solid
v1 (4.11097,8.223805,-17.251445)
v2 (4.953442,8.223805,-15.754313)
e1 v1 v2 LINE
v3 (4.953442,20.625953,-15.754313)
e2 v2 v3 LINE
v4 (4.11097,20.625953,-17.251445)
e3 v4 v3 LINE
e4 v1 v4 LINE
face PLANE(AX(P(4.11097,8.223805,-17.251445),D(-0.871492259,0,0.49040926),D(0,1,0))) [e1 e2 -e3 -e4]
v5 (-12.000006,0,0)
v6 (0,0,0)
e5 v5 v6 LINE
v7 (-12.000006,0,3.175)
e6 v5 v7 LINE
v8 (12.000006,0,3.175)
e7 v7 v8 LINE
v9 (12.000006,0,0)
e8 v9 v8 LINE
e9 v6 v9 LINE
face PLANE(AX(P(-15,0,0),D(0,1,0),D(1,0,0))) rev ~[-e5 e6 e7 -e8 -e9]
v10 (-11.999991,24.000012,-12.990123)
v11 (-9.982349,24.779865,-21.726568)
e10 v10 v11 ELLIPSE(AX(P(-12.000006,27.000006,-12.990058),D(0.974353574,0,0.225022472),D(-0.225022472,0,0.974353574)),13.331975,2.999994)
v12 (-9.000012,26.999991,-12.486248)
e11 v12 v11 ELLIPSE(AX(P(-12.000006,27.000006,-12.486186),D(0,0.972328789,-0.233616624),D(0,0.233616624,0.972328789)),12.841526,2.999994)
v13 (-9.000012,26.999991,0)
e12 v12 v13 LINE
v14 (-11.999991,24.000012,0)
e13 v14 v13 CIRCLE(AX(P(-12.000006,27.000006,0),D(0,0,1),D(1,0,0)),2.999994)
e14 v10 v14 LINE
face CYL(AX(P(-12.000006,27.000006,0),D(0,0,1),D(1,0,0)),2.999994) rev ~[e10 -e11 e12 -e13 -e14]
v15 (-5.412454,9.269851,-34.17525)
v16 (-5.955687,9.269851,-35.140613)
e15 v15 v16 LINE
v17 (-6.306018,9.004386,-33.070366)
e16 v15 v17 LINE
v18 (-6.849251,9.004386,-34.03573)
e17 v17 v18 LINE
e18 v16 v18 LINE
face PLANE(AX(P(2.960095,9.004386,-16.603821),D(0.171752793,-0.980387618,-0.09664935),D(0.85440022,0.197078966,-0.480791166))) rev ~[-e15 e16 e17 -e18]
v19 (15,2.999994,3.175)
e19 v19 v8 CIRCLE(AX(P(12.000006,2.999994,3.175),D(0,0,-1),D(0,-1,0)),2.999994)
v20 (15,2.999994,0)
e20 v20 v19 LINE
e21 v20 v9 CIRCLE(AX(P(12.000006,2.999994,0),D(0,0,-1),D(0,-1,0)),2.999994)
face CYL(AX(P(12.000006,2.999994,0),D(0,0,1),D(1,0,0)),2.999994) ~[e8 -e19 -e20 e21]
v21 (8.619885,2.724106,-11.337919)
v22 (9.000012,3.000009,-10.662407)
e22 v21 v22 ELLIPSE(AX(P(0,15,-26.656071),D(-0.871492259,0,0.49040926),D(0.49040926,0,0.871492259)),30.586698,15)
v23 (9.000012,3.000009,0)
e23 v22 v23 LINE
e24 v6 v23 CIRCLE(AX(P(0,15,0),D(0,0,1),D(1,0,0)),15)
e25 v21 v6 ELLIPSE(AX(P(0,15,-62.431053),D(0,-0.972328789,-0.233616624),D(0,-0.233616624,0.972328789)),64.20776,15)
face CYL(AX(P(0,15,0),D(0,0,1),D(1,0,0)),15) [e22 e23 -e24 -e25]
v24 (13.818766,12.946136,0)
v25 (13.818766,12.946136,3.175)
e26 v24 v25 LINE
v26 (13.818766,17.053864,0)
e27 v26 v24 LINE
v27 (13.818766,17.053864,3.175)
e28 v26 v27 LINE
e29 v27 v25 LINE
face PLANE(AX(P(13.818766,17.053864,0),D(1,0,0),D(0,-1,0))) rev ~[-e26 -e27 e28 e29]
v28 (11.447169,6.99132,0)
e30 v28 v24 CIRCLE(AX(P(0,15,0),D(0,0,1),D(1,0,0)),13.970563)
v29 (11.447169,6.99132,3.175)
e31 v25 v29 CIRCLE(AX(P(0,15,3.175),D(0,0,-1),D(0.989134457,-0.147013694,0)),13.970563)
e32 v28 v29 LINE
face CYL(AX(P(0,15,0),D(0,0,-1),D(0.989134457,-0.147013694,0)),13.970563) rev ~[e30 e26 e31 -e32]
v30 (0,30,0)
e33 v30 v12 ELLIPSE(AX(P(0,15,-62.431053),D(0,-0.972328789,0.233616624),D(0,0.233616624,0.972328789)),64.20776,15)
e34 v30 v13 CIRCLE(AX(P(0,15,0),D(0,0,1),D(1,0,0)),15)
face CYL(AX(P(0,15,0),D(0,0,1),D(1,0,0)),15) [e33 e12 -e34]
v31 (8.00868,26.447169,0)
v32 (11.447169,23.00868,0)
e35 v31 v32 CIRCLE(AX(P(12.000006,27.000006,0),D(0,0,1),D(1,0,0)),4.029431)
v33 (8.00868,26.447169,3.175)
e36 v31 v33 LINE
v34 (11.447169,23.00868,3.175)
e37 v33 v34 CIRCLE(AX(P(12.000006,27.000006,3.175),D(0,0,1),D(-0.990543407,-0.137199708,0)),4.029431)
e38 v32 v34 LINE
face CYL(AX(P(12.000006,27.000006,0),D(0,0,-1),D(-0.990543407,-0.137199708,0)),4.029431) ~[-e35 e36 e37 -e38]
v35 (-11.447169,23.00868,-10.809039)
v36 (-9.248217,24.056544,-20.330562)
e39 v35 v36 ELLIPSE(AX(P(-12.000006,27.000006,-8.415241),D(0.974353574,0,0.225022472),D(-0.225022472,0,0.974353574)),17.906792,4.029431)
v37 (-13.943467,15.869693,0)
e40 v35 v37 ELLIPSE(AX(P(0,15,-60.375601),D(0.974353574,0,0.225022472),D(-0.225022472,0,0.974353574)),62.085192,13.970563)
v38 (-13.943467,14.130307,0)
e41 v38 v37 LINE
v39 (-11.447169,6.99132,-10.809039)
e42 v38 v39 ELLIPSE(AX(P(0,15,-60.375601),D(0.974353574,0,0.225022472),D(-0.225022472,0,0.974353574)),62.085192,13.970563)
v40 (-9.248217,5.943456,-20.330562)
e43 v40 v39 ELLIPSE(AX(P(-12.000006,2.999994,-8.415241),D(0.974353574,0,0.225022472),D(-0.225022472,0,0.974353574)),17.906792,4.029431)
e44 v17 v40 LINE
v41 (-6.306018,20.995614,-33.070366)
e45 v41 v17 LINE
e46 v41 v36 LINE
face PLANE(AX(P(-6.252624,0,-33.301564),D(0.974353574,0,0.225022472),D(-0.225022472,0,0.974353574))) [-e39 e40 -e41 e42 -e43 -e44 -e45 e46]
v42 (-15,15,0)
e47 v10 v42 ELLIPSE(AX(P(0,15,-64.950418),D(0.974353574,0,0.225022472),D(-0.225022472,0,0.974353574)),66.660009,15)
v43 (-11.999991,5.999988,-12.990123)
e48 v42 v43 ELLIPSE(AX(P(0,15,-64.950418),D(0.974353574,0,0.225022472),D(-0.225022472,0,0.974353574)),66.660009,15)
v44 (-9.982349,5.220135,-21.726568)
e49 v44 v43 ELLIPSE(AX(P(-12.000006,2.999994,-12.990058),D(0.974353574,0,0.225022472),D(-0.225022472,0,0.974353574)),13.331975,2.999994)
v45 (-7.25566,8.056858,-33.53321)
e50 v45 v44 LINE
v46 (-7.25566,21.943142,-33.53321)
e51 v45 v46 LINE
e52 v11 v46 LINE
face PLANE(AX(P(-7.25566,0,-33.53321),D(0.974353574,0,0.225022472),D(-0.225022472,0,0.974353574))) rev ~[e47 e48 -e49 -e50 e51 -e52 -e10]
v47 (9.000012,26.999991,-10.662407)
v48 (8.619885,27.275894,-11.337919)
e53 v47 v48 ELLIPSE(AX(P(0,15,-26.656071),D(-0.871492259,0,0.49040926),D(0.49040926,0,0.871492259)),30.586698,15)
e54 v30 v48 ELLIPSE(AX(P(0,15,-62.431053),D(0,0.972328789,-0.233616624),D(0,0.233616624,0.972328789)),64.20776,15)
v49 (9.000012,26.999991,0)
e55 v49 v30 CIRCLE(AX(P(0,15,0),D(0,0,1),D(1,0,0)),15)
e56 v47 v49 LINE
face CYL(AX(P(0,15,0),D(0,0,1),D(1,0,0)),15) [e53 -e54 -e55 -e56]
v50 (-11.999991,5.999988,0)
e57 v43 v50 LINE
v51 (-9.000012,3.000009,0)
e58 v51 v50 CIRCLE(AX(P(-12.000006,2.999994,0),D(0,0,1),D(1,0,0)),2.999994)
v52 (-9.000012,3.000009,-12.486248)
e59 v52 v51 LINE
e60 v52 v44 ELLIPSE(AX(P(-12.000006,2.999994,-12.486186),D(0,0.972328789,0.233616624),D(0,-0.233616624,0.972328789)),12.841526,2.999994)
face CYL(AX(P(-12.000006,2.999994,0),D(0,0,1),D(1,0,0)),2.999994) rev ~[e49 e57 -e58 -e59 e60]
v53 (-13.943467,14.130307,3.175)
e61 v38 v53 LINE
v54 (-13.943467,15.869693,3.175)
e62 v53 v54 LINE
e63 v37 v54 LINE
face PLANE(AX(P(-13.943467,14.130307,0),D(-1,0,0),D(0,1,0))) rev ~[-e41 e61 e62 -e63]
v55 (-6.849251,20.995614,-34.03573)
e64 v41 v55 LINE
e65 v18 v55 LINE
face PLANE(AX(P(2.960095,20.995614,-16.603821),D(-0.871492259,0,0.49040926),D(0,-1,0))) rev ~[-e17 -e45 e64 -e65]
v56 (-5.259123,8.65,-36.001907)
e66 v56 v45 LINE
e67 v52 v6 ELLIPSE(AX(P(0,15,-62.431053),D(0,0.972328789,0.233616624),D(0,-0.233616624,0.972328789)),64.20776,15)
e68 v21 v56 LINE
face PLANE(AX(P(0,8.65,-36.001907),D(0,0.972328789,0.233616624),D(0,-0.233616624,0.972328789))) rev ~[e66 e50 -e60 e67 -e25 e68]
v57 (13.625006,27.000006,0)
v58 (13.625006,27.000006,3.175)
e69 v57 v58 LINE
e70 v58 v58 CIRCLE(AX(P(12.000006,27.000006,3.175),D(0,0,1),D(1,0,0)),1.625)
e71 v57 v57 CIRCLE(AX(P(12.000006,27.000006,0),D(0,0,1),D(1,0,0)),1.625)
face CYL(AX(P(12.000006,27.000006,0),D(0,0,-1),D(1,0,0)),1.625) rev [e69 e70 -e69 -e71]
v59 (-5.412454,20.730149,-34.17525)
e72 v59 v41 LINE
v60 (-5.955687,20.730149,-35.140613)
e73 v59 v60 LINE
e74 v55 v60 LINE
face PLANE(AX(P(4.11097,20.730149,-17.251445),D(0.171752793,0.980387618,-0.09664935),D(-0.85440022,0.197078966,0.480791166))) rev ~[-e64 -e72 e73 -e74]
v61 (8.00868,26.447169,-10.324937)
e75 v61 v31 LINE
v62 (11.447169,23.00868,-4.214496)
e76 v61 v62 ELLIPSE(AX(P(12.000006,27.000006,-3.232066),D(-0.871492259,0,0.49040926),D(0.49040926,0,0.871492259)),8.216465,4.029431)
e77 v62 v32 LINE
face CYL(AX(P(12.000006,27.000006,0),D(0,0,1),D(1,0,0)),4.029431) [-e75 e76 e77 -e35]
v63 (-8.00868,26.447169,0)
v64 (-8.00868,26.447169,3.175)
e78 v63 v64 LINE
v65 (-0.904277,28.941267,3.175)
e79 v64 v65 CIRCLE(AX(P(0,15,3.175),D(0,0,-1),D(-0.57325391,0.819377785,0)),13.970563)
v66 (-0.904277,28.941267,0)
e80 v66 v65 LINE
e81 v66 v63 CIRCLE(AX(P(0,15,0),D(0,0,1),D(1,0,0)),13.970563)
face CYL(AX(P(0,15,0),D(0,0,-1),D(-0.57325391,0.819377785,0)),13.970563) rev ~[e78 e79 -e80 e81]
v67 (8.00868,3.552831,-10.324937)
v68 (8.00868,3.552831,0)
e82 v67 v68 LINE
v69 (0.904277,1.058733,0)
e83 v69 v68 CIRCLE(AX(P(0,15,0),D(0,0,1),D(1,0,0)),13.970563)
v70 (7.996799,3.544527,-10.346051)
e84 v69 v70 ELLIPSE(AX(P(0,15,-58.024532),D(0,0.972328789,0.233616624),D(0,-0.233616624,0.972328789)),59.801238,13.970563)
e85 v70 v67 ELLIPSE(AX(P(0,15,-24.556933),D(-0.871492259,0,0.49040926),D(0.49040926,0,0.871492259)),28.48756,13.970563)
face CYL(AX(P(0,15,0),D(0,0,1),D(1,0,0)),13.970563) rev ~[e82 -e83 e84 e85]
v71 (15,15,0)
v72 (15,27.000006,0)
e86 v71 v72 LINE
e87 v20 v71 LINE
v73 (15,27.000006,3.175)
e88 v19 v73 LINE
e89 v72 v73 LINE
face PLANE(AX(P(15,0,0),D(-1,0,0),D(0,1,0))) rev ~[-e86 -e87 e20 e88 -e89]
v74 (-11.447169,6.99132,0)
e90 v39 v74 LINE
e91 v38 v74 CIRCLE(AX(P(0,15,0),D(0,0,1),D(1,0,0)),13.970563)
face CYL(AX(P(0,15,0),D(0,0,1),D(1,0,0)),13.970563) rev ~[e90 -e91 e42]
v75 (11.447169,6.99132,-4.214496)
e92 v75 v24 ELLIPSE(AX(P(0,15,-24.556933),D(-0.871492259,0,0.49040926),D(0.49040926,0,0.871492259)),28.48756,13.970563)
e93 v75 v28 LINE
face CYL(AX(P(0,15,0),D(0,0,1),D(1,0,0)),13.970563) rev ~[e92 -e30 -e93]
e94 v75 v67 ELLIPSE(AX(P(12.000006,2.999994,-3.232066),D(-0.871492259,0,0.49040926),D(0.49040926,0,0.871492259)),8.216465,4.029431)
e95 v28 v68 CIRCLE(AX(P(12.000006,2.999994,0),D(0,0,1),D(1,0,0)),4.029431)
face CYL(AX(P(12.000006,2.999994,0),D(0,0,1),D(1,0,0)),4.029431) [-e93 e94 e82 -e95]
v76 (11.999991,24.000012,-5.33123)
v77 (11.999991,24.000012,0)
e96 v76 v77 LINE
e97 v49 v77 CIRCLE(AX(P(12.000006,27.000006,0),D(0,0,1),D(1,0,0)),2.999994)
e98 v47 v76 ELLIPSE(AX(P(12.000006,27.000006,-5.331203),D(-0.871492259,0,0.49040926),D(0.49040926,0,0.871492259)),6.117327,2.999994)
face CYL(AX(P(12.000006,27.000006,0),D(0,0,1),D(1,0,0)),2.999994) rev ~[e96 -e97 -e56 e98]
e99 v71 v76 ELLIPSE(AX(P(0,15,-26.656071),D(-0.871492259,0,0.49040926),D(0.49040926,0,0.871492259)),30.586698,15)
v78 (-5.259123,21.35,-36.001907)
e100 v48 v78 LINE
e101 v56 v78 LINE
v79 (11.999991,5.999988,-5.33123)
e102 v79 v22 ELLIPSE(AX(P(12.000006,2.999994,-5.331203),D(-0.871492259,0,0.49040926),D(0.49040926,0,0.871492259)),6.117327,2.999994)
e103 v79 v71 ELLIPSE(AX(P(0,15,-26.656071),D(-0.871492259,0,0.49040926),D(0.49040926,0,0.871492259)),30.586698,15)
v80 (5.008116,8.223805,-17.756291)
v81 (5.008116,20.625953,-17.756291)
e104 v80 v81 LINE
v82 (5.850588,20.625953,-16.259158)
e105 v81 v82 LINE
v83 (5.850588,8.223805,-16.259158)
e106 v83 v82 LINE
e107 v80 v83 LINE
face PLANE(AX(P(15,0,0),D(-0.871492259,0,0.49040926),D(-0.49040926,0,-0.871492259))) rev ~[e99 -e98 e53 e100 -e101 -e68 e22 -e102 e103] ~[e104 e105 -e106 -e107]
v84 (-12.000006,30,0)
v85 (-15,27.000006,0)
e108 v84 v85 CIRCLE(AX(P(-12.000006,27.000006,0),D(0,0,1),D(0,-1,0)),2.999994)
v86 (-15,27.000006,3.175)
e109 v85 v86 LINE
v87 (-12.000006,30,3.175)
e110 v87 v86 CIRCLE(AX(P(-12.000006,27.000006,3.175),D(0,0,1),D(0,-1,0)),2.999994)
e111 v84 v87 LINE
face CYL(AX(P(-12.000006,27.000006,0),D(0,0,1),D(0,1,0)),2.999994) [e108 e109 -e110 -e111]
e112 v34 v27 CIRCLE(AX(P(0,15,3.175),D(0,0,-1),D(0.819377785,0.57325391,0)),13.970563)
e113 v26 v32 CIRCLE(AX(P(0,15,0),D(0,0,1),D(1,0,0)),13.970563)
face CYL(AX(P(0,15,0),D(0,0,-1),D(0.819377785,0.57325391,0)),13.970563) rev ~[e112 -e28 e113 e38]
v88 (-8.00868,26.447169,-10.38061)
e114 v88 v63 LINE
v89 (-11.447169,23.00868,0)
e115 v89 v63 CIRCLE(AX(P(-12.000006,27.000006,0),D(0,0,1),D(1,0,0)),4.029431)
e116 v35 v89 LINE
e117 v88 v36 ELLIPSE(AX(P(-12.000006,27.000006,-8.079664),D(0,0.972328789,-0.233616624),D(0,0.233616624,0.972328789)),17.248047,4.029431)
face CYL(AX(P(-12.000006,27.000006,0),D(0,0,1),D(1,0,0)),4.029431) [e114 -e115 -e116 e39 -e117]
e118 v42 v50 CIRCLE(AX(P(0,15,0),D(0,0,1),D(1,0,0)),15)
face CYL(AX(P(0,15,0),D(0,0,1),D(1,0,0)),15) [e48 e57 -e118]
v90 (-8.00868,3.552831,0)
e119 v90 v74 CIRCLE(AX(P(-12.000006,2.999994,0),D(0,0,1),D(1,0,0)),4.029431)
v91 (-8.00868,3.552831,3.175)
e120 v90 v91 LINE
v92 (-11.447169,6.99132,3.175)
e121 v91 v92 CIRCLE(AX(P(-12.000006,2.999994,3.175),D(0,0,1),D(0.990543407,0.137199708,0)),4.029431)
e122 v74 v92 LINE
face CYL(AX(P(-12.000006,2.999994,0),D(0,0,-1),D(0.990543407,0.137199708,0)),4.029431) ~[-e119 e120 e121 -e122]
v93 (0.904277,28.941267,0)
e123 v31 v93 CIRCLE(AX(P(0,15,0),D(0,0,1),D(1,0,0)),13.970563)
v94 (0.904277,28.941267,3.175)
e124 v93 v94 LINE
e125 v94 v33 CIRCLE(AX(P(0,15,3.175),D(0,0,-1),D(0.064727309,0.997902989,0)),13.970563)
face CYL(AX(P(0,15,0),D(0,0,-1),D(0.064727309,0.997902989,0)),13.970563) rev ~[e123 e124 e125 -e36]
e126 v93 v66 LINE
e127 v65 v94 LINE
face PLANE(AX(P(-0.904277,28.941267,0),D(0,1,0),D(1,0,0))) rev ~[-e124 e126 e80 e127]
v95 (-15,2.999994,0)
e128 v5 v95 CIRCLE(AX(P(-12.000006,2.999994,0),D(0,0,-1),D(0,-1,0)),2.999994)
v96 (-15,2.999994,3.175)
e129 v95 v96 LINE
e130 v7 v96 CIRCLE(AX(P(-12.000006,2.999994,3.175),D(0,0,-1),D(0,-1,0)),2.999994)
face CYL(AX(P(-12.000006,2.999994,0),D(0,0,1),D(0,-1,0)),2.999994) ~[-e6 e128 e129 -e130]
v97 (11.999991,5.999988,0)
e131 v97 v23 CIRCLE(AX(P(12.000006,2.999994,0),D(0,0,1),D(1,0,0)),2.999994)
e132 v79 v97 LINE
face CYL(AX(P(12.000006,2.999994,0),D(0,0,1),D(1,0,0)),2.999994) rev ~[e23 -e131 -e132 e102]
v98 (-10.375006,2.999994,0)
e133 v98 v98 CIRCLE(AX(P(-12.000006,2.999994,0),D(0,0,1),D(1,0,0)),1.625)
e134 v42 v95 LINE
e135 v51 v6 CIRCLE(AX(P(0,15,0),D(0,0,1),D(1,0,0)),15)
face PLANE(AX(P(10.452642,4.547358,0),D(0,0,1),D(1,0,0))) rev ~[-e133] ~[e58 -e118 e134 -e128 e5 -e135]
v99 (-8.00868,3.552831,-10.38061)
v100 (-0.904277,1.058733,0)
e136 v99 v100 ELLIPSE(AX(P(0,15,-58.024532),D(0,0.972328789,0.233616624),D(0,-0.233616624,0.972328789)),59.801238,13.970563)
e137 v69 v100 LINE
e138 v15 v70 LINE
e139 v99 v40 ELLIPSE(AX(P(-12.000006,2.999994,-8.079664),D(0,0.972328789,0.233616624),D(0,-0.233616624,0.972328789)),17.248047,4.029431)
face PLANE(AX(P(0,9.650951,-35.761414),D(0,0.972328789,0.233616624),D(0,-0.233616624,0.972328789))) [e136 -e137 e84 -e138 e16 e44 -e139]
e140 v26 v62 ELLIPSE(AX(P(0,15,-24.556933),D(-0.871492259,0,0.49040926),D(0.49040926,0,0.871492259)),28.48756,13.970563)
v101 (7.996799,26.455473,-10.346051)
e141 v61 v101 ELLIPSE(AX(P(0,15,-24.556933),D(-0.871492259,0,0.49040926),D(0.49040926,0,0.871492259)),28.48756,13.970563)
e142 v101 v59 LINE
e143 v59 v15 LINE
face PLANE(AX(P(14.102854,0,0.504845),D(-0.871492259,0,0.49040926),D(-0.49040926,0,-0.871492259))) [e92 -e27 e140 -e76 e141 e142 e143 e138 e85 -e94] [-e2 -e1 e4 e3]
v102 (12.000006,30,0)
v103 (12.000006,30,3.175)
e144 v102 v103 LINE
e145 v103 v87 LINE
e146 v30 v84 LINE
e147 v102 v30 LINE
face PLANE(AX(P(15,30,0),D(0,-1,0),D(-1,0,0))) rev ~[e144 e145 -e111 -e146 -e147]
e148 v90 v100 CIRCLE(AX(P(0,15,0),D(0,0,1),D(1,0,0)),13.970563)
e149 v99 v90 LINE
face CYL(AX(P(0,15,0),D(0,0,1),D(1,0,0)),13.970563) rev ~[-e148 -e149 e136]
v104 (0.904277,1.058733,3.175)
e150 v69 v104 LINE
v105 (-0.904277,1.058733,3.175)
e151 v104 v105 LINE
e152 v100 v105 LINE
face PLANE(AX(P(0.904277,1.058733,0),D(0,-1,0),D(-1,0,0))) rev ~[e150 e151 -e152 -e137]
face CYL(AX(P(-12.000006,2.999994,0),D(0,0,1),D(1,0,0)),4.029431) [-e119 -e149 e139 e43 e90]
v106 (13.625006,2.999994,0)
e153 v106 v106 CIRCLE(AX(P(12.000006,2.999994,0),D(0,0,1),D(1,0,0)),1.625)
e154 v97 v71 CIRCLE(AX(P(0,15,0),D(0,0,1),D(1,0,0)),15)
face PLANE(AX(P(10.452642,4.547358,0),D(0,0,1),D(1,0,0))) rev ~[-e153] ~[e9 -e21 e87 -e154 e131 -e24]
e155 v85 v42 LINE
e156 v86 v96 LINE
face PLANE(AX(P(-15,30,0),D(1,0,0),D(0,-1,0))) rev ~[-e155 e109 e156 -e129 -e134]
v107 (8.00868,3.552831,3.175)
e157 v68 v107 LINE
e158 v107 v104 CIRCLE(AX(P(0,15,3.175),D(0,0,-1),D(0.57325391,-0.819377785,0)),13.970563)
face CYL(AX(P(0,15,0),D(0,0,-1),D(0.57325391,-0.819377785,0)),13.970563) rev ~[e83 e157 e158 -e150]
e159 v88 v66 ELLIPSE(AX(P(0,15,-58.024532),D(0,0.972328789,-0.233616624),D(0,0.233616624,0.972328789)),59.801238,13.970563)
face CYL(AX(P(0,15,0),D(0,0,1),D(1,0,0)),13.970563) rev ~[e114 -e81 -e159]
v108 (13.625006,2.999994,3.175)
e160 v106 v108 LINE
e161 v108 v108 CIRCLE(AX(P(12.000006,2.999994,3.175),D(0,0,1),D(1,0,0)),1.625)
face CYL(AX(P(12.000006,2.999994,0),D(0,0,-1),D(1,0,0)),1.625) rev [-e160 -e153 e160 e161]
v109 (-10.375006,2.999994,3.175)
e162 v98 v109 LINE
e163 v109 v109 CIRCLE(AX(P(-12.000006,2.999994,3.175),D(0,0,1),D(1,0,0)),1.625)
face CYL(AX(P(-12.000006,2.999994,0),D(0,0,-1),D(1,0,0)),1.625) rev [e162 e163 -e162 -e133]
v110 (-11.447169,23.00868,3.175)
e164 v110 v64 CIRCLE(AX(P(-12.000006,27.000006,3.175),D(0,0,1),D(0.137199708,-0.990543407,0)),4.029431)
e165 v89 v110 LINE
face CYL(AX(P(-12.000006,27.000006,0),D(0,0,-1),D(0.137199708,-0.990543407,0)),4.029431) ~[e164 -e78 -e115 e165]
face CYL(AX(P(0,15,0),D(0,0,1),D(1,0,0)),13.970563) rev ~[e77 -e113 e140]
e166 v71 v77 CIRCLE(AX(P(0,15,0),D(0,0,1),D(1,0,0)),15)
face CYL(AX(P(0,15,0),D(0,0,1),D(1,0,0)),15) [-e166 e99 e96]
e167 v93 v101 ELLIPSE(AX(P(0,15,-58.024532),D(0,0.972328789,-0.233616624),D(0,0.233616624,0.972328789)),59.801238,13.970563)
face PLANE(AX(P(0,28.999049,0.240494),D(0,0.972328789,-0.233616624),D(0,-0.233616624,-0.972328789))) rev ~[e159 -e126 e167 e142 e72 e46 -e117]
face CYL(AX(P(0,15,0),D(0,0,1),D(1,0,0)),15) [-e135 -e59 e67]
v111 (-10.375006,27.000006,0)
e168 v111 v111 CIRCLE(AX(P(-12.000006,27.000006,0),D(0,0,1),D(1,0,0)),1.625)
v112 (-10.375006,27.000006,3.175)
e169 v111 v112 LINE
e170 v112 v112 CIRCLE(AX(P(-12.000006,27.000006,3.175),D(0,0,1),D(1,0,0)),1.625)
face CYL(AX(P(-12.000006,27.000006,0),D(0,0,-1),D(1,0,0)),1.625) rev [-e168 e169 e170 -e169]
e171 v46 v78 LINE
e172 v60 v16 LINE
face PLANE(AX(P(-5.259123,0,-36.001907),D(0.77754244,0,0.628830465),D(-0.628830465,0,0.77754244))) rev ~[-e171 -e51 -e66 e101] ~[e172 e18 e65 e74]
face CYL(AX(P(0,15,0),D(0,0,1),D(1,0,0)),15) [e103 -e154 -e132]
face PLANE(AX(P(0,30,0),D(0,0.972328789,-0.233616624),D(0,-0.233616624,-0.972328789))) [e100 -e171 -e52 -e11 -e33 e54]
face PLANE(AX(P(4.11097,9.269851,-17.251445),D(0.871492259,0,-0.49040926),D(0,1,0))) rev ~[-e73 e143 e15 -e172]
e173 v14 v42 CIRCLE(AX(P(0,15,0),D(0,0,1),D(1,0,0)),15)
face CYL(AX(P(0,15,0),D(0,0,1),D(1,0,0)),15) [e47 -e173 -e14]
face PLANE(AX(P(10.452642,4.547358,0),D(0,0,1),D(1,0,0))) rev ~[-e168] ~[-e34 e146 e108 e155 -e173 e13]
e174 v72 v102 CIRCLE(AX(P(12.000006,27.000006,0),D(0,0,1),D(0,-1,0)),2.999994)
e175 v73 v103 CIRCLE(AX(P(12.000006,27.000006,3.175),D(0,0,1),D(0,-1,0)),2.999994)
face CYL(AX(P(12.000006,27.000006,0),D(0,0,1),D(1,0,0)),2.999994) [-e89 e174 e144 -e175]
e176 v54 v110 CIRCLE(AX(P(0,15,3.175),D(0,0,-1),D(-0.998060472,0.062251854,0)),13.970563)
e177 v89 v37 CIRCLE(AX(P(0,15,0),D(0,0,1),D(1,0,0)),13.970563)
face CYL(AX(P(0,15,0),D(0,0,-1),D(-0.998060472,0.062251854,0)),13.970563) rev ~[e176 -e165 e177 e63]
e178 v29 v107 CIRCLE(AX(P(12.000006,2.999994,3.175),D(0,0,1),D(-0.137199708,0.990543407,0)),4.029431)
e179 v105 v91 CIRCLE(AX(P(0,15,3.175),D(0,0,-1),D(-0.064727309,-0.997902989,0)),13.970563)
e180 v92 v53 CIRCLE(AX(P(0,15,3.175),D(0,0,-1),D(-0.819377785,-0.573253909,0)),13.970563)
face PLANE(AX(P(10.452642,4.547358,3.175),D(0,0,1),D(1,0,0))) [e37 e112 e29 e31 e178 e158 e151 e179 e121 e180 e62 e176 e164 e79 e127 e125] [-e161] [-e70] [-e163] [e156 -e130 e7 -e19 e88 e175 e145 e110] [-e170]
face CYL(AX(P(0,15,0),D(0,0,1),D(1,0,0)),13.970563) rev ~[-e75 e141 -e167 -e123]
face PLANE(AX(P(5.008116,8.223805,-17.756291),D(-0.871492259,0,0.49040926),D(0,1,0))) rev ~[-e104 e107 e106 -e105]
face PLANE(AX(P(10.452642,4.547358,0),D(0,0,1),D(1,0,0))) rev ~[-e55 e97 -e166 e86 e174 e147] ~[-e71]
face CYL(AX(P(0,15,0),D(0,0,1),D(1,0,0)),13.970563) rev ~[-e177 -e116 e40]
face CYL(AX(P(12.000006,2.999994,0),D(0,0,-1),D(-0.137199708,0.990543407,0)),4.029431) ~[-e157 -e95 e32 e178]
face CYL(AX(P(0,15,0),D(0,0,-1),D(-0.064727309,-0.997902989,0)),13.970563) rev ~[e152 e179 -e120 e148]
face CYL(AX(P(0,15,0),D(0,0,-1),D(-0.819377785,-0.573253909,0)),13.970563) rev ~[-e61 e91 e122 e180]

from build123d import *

# Parameters (mm, degrees)
F0_R          = 15
F1_DEPTH      = 50.8
F3_DEPTH      = 50.8
F5_DEPTH      = 16
F5_DEPTH_BACK = 25.4
F6_R          = 2.999994
F7_DEPTH      = 75
F8_T          = -1.0294366
F9_R          = 1.625
F10_DEPTH     = 3.175
F11_R         = 2.999994
F12_W         = 12.402147986
F12_H         = 1.7178952694
F13_DEPTH     = 1.0294366
F15_REACH     = 37.7778044783
F16_DEPTH     = 1.7178952694


# Not quite as in the source:
# - an extrude ends at something that could not be found from the text; its depth is read off the source's solid


with BuildPart() as f1:
    # F0 (on Top) → F1 (new body)
    with BuildSketch(Plane.XY):
        with Locations((0, 15)):
            Circle(F0_R)
    extrude(amount=-F1_DEPTH)

    # F2 (on Front) → F3 (cut)
    with BuildSketch(Plane.XZ):
        Polygon((-15, 0), (-15, -50.8), (15, -50.8), (15, 0), (-5.2591228073, -36.0019072397), (-7.2556595325, -33.5332099912), align=None)
    extrude(amount=-F3_DEPTH, mode=Mode.SUBTRACT)

    # F4 (on Right) → F5 (cut, two sides)
    with BuildSketch(Plane.YZ) as f5_sk:
        Polygon((30, -36.0019072397), (30, 0), (21.35, -36.0019072397), align=None)
        Polygon((8.65, -36.0019072397), (0, 0), (0, -36.0019072397), align=None)
    extrude(amount=-F5_DEPTH, mode=Mode.SUBTRACT)
    extrude(f5_sk.sketch, amount=F5_DEPTH_BACK, mode=Mode.SUBTRACT)

    # F6 (on face) → F7 (cut, through all)
    with BuildSketch(Plane.XY):
        with Locations((12.000006, 27.000006)):
            Circle(F6_R)
        with Locations((12.000006, 2.999994)):
            Circle(F6_R)
        with Locations((-12.000006, 2.999994)):
            Circle(F6_R)
        with Locations((-12.000006, 27.000006)):
            Circle(F6_R)
    extrude(amount=-F7_DEPTH, mode=Mode.SUBTRACT)

    # F8
    f8_openings = [f1.faces().sort_by_distance(p)[0] for p in [
        (0, 15, 0),
    ]]
    offset(amount=F8_T, openings=f8_openings)

    # F9 (on face) → F10 (join)
    with BuildSketch(Plane.XY):
        with BuildLine():
            Line((1.23e-08, 0), (15, 0))
            Line((15, 0), (15, 15))
            ThreePointArc((15, 15), (14.230247099, 10.2565763946), (11.999991, 5.999988))
            ThreePointArc((11.999991, 5.999988), (9.8786898991, 5.1213101009), (9.000012, 3.000009))
            ThreePointArc((9.000012, 3.000009), (4.7434236112, 0.7697529029), (1.23e-08, 0))
        make_face()
        with Locations((12.000006, 2.999994)):
            Circle(F9_R, mode=Mode.SUBTRACT)
        with BuildLine():
            Line((-15, 0), (1.23e-08, 0))
            ThreePointArc((1.23e-08, 0), (-4.7434235996, 0.769752899), (-9.000012, 3.000009))
            ThreePointArc((-9.000012, 3.000009), (-9.8786898991, 5.1213101009), (-11.999991, 5.999988))
            ThreePointArc((-11.999991, 5.999988), (-14.230247099, 10.2565763946), (-15, 15))
            Line((-15, 15), (-15, 0))
        make_face()
        with Locations((-12.000006, 2.999994)):
            Circle(F9_R, mode=Mode.SUBTRACT)
        with BuildLine():
            ThreePointArc((-9.000012, 3.000009), (-4.7434235996, 0.769752899), (1.23e-08, 0))
            ThreePointArc((1.23e-08, 0), (4.7434236112, 0.7697529029), (9.000012, 3.000009))
            ThreePointArc((9.000012, 3.000009), (9.8786898991, 5.1213101009), (11.999991, 5.999988))
            ThreePointArc((11.999991, 5.999988), (14.230247099, 10.2565763946), (15, 15))
            ThreePointArc((15, 15), (14.230247099, 19.7434236054), (11.999991, 24.000012))
            ThreePointArc((11.999991, 24.000012), (9.8786898991, 24.8786898991), (9.000012, 26.999991))
            ThreePointArc((9.000012, 26.999991), (4.7434236018, 29.2302471002), (-7.6e-09, 30))
            ThreePointArc((-7.6e-09, 30), (-4.743423609, 29.2302470978), (-9.000012, 26.999991))
            ThreePointArc((-9.000012, 26.999991), (-9.8786898991, 24.8786898991), (-11.999991, 24.000012))
            ThreePointArc((-11.999991, 24.000012), (-14.230247099, 19.7434236054), (-15, 15))
            ThreePointArc((-15, 15), (-14.230247099, 10.2565763946), (-11.999991, 5.999988))
            ThreePointArc((-11.999991, 5.999988), (-9.8786898991, 5.1213101009), (-9.000012, 3.000009))
        make_face()
        with BuildLine():
            Line((0.9042769799, 1.0587330254), (-0.9042769799, 1.0587330254))
            ThreePointArc((-0.9042769799, 1.0587330254), (-4.6276702262, 1.8181446681), (-8.0086800871, 3.5528307003))
            ThreePointArc((-8.0086800871, 3.5528307003), (-9.1507682984, 5.8492317016), (-11.4471692997, 6.9913199129))
            ThreePointArc((-11.4471692997, 6.9913199129), (-13.1875845683, 10.3886818623), (-13.9434671073, 14.1303065241))
            Line((-13.9434671073, 14.1303065241), (-13.9434671073, 15.8696934759))
            ThreePointArc((-13.9434671073, 15.8696934759), (-13.1875845683, 19.6113181377), (-11.4471692997, 23.0086800871))
            ThreePointArc((-11.4471692997, 23.0086800871), (-9.1507682984, 24.1507682984), (-8.0086800871, 26.4471692997))
            ThreePointArc((-8.0086800871, 26.4471692997), (-4.6276702262, 28.1818553319), (-0.9042769799, 28.9412669746))
            Line((-0.9042769799, 28.9412669746), (0.9042769799, 28.9412669746))
            ThreePointArc((0.9042769799, 28.9412669746), (4.6276702262, 28.1818553319), (8.0086800871, 26.4471692997))
            ThreePointArc((8.0086800871, 26.4471692997), (9.1507682984, 24.1507682984), (11.4471692997, 23.0086800871))
            ThreePointArc((11.4471692997, 23.0086800871), (12.9790918545, 20.1691214289), (13.8187656408, 17.053864133))
            Line((13.8187656408, 17.053864133), (13.8187656408, 12.946135867))
            ThreePointArc((13.8187656408, 12.946135867), (12.9790918545, 9.8308785711), (11.4471692997, 6.9913199129))
            ThreePointArc((11.4471692997, 6.9913199129), (9.1507682984, 5.8492317016), (8.0086800871, 3.5528307003))
            ThreePointArc((8.0086800871, 3.5528307003), (4.6276702262, 1.8181446681), (0.9042769799, 1.0587330254))
        make_face(mode=Mode.SUBTRACT)
        with BuildLine():
            ThreePointArc((11.999991, 24.000012), (14.230247099, 19.7434236054), (15, 15))
            Line((15, 15), (15, 30))
            Line((15, 30), (-7.6e-09, 30))
            ThreePointArc((-7.6e-09, 30), (4.7434236018, 29.2302471002), (9.000012, 26.999991))
            ThreePointArc((9.000012, 26.999991), (9.8786898991, 24.8786898991), (11.999991, 24.000012))
        make_face()
        with Locations((12.000006, 27.000006)):
            Circle(F9_R, mode=Mode.SUBTRACT)
        with BuildLine():
            Line((-15, 30), (-15, 15))
            ThreePointArc((-15, 15), (-14.230247099, 19.7434236054), (-11.999991, 24.000012))
            ThreePointArc((-11.999991, 24.000012), (-9.8786898991, 24.8786898991), (-9.000012, 26.999991))
            ThreePointArc((-9.000012, 26.999991), (-4.743423609, 29.2302470978), (-7.6e-09, 30))
            Line((-7.6e-09, 30), (-15, 30))
        make_face()
        with Locations((-12.000006, 27.000006)):
            Circle(F9_R, mode=Mode.SUBTRACT)
    extrude(amount=F10_DEPTH)

    # F11
    f11_edges = [f1.edges().sort_by_distance(p)[0] for p in [
        (15, 0, 1.5875),
        (-15, 0, 1.5875),
        (-15, 30, 1.5875),
        (15, 30, 1.5875),
    ]]
    fillet(f11_edges, radius=F11_R)

    # F12 (on face) → F13 (cut, through all)
    with BuildSketch(Plane(origin=(11.3924813609, 0, -6.4108181112), x_dir=(0, 1, 0), z_dir=(0.8714922589, 0, -0.4904092603))):
        with Locations((14.4248786382, -12.1594956145)):
            Rectangle(F12_W, F12_H)
    extrude(amount=-F13_DEPTH, mode=Mode.SUBTRACT)

    f15_end = f1.faces().sort_by_distance((-6.2722387902, 15, -34.7491996848))[0]
    # F14 (on face) → F15 (cut, up to a face of the model that its end follows)
    with BuildSketch(Plane(origin=(-6.3843651243, 0, -11.3454725151), x_dir=(0.8714922589, 0, -0.4904092603), z_dir=(0.4904092603, 0, 0.8714922589))):
        Polygon((12.0429472841, 9.2698510415), (12.0429472841, 20.7301489585), (10.7223677877, 20.9956137981), (10.7223677877, 9.0043862019), align=None)
    f15_long = extrude(amount=-F15_REACH, mode=Mode.PRIVATE)
    add(split(f15_long, bisect_by=f15_end, keep=Keep.BOTTOM, mode=Mode.PRIVATE), mode=Mode.SUBTRACT)

    # F16 (add, through all): a face of the model
    f16_faces = [f1.faces().sort_by_distance(p)[0] for p in [
        (4.5595432226, 14.4248786382, -17.5038680055),
    ]]
    extrude(f16_faces, amount=F16_DEPTH)


solid = f1.part
